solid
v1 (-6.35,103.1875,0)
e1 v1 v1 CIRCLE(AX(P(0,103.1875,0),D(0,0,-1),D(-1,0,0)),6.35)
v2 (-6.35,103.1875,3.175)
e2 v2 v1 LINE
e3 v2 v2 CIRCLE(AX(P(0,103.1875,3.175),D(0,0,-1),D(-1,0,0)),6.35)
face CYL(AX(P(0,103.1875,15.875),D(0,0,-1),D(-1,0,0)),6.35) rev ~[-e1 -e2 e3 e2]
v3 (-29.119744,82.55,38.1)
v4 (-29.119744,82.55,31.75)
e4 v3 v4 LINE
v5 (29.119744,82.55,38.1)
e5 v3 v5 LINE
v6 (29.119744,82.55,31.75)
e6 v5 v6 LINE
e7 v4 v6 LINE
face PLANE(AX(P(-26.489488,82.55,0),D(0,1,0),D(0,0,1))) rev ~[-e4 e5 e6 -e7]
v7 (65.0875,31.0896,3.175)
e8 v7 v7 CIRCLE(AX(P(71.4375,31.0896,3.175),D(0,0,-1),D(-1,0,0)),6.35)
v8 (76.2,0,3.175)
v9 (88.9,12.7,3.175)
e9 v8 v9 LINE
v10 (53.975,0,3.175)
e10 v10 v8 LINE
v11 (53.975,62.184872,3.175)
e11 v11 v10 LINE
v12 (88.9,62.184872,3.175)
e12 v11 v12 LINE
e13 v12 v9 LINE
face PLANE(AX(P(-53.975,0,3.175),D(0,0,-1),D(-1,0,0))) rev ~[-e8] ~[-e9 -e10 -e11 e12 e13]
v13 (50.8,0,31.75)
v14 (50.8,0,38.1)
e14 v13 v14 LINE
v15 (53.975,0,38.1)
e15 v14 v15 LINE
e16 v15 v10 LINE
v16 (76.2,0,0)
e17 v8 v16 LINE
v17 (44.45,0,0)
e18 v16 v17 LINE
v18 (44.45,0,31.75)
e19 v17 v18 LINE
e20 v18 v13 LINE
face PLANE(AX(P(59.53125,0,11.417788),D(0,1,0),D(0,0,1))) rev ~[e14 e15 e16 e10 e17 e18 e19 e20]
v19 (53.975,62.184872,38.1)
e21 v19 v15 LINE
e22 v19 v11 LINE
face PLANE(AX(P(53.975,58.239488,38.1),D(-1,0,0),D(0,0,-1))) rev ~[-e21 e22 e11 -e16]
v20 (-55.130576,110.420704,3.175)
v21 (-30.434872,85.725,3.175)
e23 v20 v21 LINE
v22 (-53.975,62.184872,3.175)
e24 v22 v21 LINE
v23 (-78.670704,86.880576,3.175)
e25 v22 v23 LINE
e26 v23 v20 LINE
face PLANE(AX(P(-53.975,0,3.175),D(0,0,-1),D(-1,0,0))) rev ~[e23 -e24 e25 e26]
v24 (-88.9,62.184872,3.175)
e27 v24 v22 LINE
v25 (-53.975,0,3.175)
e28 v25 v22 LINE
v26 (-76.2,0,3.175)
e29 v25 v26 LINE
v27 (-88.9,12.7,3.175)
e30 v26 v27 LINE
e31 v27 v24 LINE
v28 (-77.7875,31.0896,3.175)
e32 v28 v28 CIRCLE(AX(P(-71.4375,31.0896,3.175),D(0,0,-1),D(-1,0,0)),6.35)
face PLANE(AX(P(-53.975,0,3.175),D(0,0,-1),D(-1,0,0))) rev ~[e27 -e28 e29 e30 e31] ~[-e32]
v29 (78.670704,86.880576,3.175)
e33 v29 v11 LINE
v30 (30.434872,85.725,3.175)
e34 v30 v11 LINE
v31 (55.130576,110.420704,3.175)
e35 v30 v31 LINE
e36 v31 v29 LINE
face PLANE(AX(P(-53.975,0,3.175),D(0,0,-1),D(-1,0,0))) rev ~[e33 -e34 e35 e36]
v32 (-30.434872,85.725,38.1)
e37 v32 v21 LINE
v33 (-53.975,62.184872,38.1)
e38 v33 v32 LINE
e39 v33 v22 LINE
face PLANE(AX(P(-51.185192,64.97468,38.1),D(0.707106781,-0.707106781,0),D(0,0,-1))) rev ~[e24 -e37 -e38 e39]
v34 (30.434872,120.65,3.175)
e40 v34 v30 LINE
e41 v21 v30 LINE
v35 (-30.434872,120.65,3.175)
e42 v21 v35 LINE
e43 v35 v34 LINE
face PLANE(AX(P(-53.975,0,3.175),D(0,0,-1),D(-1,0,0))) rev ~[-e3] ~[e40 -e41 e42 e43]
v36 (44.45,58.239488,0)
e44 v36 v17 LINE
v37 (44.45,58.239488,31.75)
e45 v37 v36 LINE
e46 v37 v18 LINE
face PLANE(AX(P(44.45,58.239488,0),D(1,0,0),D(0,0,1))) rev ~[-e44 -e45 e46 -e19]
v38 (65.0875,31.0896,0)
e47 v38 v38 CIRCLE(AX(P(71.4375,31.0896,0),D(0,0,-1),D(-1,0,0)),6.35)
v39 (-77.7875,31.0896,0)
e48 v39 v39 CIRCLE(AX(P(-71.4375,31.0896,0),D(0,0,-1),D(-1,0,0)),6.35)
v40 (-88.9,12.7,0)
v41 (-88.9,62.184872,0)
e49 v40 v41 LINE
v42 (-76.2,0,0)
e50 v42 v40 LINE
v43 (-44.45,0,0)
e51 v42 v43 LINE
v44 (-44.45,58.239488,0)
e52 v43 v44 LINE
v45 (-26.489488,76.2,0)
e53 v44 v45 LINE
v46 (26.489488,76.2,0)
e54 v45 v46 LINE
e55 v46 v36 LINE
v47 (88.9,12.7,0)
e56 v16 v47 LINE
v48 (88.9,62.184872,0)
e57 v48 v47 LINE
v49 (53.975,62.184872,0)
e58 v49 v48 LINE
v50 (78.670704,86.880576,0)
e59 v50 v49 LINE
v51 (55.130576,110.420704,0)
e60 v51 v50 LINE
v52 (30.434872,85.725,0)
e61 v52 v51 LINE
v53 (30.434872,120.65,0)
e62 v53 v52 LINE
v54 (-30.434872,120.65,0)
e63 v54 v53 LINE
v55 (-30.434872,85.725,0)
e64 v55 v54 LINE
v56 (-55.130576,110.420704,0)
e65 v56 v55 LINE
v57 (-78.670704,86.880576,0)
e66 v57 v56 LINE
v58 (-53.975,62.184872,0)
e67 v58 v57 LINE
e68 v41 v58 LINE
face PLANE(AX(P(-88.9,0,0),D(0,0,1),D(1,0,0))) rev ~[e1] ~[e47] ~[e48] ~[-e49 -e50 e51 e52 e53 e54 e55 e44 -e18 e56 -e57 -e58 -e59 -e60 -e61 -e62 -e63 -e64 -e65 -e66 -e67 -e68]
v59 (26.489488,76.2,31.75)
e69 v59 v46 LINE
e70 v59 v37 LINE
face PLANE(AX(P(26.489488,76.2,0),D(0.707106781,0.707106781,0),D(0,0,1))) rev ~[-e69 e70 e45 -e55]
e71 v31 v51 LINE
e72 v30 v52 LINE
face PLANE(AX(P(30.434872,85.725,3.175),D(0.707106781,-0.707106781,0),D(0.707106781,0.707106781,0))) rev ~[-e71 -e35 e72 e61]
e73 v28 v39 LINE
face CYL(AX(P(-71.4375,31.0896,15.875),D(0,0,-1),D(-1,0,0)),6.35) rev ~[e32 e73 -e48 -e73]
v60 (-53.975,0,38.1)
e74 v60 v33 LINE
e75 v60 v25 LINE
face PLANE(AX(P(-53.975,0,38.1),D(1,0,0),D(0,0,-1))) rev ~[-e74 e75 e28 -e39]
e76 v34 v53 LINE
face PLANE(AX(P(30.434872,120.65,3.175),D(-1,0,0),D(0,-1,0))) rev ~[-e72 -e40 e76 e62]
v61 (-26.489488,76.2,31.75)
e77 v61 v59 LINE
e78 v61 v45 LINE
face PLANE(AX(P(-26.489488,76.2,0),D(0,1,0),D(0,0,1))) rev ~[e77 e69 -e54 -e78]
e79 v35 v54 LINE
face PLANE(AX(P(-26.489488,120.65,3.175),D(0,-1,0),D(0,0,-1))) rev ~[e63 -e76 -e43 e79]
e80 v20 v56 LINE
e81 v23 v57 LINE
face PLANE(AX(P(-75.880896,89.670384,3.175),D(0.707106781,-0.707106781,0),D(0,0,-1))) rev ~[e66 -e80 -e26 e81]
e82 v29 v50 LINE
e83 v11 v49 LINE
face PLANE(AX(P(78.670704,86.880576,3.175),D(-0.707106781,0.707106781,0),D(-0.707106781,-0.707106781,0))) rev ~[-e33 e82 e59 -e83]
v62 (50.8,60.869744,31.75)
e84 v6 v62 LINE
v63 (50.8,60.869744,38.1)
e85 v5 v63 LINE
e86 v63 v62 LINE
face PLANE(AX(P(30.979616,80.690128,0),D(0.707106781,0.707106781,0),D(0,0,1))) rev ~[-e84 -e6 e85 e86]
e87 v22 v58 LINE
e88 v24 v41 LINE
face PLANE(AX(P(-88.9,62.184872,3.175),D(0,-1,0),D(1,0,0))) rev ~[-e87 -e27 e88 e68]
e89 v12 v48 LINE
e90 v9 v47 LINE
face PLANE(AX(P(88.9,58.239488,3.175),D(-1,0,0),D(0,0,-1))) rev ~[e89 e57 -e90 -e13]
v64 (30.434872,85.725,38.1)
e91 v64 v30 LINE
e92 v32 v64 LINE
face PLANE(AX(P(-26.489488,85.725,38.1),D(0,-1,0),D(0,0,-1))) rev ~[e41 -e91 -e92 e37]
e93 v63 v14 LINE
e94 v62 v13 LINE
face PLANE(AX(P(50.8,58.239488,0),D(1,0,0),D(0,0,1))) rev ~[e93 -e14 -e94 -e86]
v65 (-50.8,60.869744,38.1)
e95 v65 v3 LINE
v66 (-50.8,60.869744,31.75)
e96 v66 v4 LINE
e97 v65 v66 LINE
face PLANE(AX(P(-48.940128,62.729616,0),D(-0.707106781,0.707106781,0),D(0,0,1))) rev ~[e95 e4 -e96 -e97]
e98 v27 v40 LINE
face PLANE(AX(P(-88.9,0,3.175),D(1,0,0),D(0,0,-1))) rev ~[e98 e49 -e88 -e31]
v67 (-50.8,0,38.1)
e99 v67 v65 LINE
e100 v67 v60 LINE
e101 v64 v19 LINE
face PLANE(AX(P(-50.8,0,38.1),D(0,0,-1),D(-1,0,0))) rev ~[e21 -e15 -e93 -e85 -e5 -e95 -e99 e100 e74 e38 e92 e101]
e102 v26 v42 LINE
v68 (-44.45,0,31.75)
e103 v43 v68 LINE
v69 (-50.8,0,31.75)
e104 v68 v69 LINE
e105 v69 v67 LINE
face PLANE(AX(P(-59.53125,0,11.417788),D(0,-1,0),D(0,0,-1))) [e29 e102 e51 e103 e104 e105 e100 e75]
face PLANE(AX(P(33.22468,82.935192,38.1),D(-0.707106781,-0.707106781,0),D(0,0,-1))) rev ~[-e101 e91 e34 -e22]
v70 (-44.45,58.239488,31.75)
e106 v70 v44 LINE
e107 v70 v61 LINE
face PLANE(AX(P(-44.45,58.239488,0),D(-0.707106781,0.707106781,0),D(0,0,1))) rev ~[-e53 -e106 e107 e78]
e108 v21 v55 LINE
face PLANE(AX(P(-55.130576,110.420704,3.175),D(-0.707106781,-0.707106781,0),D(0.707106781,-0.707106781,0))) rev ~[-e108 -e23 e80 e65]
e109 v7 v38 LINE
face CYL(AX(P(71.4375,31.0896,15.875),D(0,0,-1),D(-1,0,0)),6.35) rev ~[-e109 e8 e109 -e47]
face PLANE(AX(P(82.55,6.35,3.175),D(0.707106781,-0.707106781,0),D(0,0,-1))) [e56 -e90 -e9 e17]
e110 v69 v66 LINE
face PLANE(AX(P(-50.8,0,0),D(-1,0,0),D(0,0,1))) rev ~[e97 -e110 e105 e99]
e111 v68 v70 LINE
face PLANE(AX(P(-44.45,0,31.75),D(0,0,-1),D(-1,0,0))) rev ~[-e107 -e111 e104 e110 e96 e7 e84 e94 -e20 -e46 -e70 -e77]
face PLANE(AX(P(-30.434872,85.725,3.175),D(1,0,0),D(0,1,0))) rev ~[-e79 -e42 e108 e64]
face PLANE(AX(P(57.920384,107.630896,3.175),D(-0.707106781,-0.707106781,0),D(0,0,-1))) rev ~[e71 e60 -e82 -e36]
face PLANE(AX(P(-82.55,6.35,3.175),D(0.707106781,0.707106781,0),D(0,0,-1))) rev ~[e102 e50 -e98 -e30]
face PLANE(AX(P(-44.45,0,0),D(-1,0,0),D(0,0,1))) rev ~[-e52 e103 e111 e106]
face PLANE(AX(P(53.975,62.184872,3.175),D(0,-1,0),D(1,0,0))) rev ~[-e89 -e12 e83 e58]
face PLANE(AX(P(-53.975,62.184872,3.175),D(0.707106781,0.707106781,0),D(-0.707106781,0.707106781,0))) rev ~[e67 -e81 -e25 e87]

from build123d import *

# Parameters (mm, degrees)
F4_D     = 12.7
F4_DEPTH = 12.7
F4_TIP   = 3.8154649308
F6_DEPTH = 3.176
F7_SIZE  = 12.7


# Not quite as in the source:
# - a feature names something its author has since deleted; it is built from what else it names


with BuildPart() as f2:
    # F2: sweep along a path in F1
    with BuildLine(Plane.XY) as f2_path:
        Line((-44.45, 0), (-44.45, 58.2394877579))
        Line((-44.45, 58.2394877579), (-26.4894877579, 76.2))
        Line((-26.4894877579, 76.2), (26.4894877579, 76.2))
        Line((26.4894877579, 76.2), (44.45, 58.2394877579))
        Line((44.45, 58.2394877579), (44.45, 0))
    # F0 (on Front) → F2 (sweep)
    with BuildSketch(Plane.XZ):
        Polygon((-50.8, 38.1), (-53.975, 38.1), (-53.975, 3.175), (-88.9, 3.175), (-88.9, 0), (-53.975, 0), (-50.8, 0), (-50.8, 3.175), (-50.8, 31.75), align=None)
        Polygon((-44.45, 31.75), (-50.8, 31.75), (-50.8, 3.175), (-50.8, 0), (-44.45, 0), align=None)
    sweep(path=f2_path.line, transition=Transition.RIGHT)

    # F4
    with Locations(Plane.XY.offset(3.175)):
        with Locations((-71.4375, 31.0896), (71.4375, 31.0896), (0, 103.1875)):
            Hole(F4_D / 2, depth=F4_DEPTH)
            with Locations((0, 0, -(F4_DEPTH + F4_TIP / 2))):  # 118° drill point
                Cone(0, F4_D / 2, F4_TIP, mode=Mode.SUBTRACT)

    # F5 (on face) → F6 (cut, through all)
    with BuildSketch(Plane.XY.offset(3.175)):
        Polygon((-88.9, 62.1848719395), (-53.975, 62.1848719395), (-78.6707043329, 86.8805762724), (-88.9, 76.6512806053), align=None)
        Polygon((-55.1305762724, 110.4207043329), (-30.4348719395, 85.725), (-30.4348719395, 120.65), (-44.9012806053, 120.65), align=None)
        Polygon((30.4348719395, 120.65), (30.4348719395, 85.725), (55.1305762724, 110.4207043329), (44.9012806053, 120.65), align=None)
        Polygon((78.6707043329, 86.8805762724), (53.975, 62.1848719395), (88.9, 62.1848719395), (88.9, 76.6512806053), align=None)
    extrude(amount=-F6_DEPTH, mode=Mode.SUBTRACT)

    # F7
    f7_edges = [f2.edges().sort_by_distance(p)[0] for p in [
        (-88.9, 0, 1.5875),
        (88.9, 0, 1.5875),
    ]]
    chamfer(f7_edges, length=F7_SIZE)


solid = f2.part
